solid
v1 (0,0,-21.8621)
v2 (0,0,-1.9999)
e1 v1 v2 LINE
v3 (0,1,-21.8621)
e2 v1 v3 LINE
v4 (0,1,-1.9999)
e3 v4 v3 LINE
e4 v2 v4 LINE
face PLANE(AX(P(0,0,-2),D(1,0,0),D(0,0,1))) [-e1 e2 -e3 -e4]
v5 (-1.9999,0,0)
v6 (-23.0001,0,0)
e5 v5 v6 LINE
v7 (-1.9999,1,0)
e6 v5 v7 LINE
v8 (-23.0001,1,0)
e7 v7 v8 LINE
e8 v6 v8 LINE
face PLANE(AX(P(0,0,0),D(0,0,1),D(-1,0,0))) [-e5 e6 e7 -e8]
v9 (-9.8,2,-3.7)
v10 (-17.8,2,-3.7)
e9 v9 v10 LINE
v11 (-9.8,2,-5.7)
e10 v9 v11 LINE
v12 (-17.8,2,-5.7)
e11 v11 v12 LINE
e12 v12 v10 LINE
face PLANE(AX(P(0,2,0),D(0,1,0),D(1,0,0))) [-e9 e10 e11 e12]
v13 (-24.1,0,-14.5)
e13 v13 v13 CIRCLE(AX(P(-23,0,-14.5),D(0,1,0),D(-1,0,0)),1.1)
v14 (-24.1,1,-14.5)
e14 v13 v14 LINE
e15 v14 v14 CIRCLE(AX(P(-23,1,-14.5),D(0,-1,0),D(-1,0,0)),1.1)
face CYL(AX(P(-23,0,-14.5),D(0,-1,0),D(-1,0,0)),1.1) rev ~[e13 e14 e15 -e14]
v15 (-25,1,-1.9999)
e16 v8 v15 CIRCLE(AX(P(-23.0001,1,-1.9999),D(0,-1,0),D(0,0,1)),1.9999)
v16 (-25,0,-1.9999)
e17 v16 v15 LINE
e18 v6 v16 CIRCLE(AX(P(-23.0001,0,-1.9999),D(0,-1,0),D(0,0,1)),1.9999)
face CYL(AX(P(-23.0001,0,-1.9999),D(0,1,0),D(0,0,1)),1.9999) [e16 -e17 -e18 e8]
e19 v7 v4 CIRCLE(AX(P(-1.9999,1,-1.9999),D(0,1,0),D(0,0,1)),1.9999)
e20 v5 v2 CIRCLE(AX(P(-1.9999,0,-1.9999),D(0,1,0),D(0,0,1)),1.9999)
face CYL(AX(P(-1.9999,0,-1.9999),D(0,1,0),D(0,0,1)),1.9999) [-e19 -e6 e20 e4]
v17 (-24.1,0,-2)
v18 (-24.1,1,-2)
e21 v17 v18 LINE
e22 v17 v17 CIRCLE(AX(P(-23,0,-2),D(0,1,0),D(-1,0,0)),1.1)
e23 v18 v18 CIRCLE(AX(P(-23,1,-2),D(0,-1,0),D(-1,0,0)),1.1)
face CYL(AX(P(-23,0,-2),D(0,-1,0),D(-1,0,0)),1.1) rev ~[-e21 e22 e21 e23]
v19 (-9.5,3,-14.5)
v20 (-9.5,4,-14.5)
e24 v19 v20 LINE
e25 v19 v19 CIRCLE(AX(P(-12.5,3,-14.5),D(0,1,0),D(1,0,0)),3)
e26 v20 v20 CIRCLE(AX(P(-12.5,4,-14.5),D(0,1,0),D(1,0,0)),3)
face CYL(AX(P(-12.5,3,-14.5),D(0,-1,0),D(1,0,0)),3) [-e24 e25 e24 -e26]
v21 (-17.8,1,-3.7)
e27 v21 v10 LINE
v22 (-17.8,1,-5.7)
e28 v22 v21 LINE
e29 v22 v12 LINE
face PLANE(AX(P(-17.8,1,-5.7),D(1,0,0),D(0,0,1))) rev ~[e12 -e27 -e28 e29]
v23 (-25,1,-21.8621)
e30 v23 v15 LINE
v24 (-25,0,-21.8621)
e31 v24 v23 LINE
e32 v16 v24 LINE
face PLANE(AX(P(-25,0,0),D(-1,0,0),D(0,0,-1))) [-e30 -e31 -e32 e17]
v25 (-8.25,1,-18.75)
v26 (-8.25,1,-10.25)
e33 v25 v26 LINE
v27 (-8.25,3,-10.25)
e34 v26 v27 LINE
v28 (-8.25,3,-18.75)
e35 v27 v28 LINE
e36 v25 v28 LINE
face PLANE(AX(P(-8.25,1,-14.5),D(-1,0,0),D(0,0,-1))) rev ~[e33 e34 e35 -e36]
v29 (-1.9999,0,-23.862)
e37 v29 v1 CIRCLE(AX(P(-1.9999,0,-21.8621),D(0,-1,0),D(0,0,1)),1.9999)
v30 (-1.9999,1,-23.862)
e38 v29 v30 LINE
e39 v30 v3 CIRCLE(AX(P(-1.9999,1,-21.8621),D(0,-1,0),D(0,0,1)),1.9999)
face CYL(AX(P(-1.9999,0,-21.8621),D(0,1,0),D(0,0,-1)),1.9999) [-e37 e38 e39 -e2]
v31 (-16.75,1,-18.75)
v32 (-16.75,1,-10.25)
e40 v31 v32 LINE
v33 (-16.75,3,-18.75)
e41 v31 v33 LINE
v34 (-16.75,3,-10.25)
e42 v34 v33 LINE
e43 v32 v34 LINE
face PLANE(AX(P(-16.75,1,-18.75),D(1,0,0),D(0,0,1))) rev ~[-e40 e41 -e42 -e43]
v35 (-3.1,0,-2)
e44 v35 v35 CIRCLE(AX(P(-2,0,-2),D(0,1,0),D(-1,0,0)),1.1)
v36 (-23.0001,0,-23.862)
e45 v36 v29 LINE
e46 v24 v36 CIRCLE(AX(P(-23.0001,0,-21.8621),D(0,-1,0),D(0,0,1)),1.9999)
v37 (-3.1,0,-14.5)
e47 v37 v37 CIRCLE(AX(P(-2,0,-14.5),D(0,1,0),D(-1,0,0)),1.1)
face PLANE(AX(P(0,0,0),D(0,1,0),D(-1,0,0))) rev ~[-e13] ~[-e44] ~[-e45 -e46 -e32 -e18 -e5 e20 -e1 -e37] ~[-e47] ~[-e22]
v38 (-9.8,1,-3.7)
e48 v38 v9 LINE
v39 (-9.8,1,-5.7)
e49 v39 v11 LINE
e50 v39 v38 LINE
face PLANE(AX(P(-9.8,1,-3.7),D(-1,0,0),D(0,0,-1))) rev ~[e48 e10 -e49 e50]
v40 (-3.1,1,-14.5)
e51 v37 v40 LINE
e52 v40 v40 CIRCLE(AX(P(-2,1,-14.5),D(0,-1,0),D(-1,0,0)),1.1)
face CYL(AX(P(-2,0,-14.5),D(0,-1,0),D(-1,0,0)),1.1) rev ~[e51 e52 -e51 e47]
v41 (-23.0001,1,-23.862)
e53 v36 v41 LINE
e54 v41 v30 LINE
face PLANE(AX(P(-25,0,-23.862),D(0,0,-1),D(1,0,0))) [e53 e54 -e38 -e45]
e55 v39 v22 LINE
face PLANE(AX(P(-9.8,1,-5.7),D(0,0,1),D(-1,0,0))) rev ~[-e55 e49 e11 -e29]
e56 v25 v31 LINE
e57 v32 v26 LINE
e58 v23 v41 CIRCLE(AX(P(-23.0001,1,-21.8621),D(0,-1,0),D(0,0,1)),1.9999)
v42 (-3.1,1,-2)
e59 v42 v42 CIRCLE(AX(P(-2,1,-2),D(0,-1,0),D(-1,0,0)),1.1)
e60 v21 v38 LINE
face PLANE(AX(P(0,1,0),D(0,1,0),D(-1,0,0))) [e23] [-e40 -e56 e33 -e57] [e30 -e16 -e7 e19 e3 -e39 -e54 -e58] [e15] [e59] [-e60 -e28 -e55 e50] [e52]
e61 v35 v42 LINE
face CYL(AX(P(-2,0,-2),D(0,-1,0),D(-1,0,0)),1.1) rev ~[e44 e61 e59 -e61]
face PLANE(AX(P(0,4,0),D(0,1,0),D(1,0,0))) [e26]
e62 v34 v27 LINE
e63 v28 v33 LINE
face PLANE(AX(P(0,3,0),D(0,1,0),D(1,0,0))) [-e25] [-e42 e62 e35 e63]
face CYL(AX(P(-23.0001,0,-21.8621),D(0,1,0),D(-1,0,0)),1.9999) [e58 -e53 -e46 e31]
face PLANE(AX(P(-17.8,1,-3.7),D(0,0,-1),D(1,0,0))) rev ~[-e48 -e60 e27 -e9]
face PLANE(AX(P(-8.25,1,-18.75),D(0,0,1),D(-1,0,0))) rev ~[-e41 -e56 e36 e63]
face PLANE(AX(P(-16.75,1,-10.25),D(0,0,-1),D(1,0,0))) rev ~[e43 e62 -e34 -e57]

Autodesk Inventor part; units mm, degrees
ref_plane "YZ Plane" through (0, 0, 0) normal (1, 0, 0) x (0, 1, 0)
ref_plane "XZ Plane" through (0, 0, 0) normal (0, 1, 0) x (-1, 0, 0)
ref_plane "XY Plane" through (0, 0, 0) normal (0, 0, 1) x (1, 0, 0)
sketch "Sketch1" plane through (0, 0, 0) normal (0, 1, 0) x (-1, 0, 0)
  line L0 (0, 0) -> (25, 0)
  line L1 (25, 0) -> (25, -23.862)
  line L2 (25, -23.862) -> (0, -23.862)
  line L3 (0, -23.862) -> (0, 0)
  line L4 (0, 0) -> (0, -2)
  line L5 (0, -2) -> (2, -2)
  line L6 (25, 0) -> (25, -2)
  line L7 (25, -2) -> (23, -2)
  circle A0 centre (2, -2) radius 1.1
  circle A1 centre (23, -2) radius 1.1
  line L8 (0, -2) -> (0, -14.5)
  line L9 (0, -14.5) -> (2, -14.5)
  line L10 (23, -2) -> (23, -14.5)
  circle A2 centre (23, -14.5) radius 1.1
  circle A3 centre (2, -14.5) radius 1.1
  dimension "d0" = 25
  dimension "d1" = 23.862
  dimension "d2" = 2
  dimension "d3" = 2
  dimension "d4" = 2
  dimension "d5" = 2
  dimension "d6" = 2.2
  dimension "d7" = 2.2
  dimension "d8" = 12.5
  dimension "d9" = 2
  dimension "d10" = 12.5
  dimension "d11" = 2.2
  dimension "d12" = 2.2
extrude "Extrusion1" add sketch "Sketch1" along normal blind 1
fillet "Fillet1" radius 2 4 edges at (0, 0.5, 0) (0, 0.5, -23.862) (-25, 0.5, -23.862) (-25, 0.5, 0)
sketch "Sketch2" plane through (0, 1, 0) normal (0, 1, 0) x (1, 0, 0)
  arc A0 (-25, 2) -> (-23, 0) centre (-23, 2) ccw projected
  line L0 (-23, 0) -> (-2, 0) projected
  arc A1 (-2, 0) -> (0, 2) centre (-2, 2) ccw projected
  line L1 (0, 2) -> (0, 21.862) projected
  arc A2 (0, 21.862) -> (-2, 23.862) centre (-2, 21.862) ccw projected
  line L2 (-2, 23.862) -> (-23, 23.862) projected
  arc A3 (-23, 23.862) -> (-25, 21.862) centre (-23, 21.862) ccw projected
  line L3 (-25, 21.862) -> (-25, 2) projected
  circle A4 centre (-23, 14.5) radius 1.1 projected
  circle A5 centre (-23, 2) radius 1.1 projected
  circle A6 centre (-2, 14.5) radius 1.1 projected
  circle A7 centre (-2, 2) radius 1.1 projected
  circle A8 centre (-23, 14.5) radius 1.1 projected
  circle A9 centre (-2, 14.5) radius 1.1 projected
  line L4 (-23, 14.5) -> (-2, 14.5)
  line L5 (-12.5, 14.5) -> (-16.75, 14.5)
  line L6 (-16.75, 14.5) -> (-16.75, 10.25)
  line L7 (-16.75, 10.25) -> (-8.25, 10.25)
  line L8 (-8.25, 10.25) -> (-8.25, 18.75)
  line L9 (-8.25, 18.75) -> (-16.75, 18.75)
  line L10 (-16.75, 18.75) -> (-16.75, 10.25)
  point P0 (0, 0)
  dimension "d16" = 4.25
  dimension "d17" = 4.25
  dimension "d18" = 8.5
  dimension "d19" = 8.5
extrude "Extrusion2" add sketch "Sketch2" along normal blind 2 contours L10 L9 L8 L4 | L4 L8 L7 L6
sketch "Sketch3" plane through (0, 3, 0) normal (0, 1, 0) x (1, 0, 0)
  line L0 (-16.75, 18.75) -> (-16.75, 10.25) projected
  line L1 (-16.75, 10.25) -> (-8.25, 10.25) projected
  line L2 (-8.25, 10.25) -> (-8.25, 18.75) projected
  line L3 (-8.25, 18.75) -> (-16.75, 18.75) projected
  circle A0 centre (-12.5, 14.5) radius 3
  point P0 (0, 0)
  dimension "d22" = 6
extrude "Extrusion3" add sketch "Sketch3" along normal blind 1 contours A0
sketch "Sketch4" plane through (0, 1, 0) normal (0, 1, 0) x (1, 0, 0)
  line L0 (-16.75, 18.75) -> (-8.25, 18.75) projected
  line L1 (-8.25, 18.75) -> (-8.25, 10.25) projected
  line L2 (-8.25, 10.25) -> (-16.75, 10.25) projected
  line L3 (-16.75, 10.25) -> (-16.75, 18.75) projected
  arc A0 (-25, 2) -> (-23, 0) centre (-23, 2) ccw projected
  line L4 (-23, 0) -> (-2, 0) projected
  arc A1 (-2, 0) -> (0, 2) centre (-2, 2) ccw projected
  line L5 (0, 2) -> (0, 21.862) projected
  arc A2 (0, 21.862) -> (-2, 23.862) centre (-2, 21.862) ccw projected
  line L6 (-2, 23.862) -> (-23, 23.862) projected
  arc A3 (-23, 23.862) -> (-25, 21.862) centre (-23, 21.862) ccw projected
  line L7 (-25, 21.862) -> (-25, 2) projected
  circle A4 centre (-23, 14.5) radius 1.1 projected
  circle A5 centre (-23, 2) radius 1.1 projected
  circle A6 centre (-2, 14.5) radius 1.1 projected
  circle A7 centre (-2, 2) radius 1.1 projected
  line L8 (0, 0) -> (-13.8, 0)
  line L9 (-23, 0) -> (-2, 0) projected
  line L10 (-13.8, 0) -> (-13.8, 4.7)
  line L11 (-13.8, 4.7) -> (-9.8, 4.7)
  line L12 (-9.8, 4.7) -> (-9.8, 5.7)
  line L13 (-9.8, 5.7) -> (-17.8, 5.7)
  line L14 (-17.8, 5.7) -> (-17.8, 3.7)
  line L15 (-17.8, 3.7) -> (-9.8, 3.7)
  line L16 (-9.8, 3.7) -> (-9.8, 5.7)
  dimension "d25" = 13.8
  dimension "d26" = 4.7
  dimension "d27" = 4
  dimension "d28" = 1
  dimension "d29" = 8
  dimension "d30" = 2
extrude "Extrusion4" add sketch "Sketch4" along normal blind 1 contours L15 L14 L13 L12 L11 L10 | L10 L11 L16 L15
properties part number "rpiCam"
